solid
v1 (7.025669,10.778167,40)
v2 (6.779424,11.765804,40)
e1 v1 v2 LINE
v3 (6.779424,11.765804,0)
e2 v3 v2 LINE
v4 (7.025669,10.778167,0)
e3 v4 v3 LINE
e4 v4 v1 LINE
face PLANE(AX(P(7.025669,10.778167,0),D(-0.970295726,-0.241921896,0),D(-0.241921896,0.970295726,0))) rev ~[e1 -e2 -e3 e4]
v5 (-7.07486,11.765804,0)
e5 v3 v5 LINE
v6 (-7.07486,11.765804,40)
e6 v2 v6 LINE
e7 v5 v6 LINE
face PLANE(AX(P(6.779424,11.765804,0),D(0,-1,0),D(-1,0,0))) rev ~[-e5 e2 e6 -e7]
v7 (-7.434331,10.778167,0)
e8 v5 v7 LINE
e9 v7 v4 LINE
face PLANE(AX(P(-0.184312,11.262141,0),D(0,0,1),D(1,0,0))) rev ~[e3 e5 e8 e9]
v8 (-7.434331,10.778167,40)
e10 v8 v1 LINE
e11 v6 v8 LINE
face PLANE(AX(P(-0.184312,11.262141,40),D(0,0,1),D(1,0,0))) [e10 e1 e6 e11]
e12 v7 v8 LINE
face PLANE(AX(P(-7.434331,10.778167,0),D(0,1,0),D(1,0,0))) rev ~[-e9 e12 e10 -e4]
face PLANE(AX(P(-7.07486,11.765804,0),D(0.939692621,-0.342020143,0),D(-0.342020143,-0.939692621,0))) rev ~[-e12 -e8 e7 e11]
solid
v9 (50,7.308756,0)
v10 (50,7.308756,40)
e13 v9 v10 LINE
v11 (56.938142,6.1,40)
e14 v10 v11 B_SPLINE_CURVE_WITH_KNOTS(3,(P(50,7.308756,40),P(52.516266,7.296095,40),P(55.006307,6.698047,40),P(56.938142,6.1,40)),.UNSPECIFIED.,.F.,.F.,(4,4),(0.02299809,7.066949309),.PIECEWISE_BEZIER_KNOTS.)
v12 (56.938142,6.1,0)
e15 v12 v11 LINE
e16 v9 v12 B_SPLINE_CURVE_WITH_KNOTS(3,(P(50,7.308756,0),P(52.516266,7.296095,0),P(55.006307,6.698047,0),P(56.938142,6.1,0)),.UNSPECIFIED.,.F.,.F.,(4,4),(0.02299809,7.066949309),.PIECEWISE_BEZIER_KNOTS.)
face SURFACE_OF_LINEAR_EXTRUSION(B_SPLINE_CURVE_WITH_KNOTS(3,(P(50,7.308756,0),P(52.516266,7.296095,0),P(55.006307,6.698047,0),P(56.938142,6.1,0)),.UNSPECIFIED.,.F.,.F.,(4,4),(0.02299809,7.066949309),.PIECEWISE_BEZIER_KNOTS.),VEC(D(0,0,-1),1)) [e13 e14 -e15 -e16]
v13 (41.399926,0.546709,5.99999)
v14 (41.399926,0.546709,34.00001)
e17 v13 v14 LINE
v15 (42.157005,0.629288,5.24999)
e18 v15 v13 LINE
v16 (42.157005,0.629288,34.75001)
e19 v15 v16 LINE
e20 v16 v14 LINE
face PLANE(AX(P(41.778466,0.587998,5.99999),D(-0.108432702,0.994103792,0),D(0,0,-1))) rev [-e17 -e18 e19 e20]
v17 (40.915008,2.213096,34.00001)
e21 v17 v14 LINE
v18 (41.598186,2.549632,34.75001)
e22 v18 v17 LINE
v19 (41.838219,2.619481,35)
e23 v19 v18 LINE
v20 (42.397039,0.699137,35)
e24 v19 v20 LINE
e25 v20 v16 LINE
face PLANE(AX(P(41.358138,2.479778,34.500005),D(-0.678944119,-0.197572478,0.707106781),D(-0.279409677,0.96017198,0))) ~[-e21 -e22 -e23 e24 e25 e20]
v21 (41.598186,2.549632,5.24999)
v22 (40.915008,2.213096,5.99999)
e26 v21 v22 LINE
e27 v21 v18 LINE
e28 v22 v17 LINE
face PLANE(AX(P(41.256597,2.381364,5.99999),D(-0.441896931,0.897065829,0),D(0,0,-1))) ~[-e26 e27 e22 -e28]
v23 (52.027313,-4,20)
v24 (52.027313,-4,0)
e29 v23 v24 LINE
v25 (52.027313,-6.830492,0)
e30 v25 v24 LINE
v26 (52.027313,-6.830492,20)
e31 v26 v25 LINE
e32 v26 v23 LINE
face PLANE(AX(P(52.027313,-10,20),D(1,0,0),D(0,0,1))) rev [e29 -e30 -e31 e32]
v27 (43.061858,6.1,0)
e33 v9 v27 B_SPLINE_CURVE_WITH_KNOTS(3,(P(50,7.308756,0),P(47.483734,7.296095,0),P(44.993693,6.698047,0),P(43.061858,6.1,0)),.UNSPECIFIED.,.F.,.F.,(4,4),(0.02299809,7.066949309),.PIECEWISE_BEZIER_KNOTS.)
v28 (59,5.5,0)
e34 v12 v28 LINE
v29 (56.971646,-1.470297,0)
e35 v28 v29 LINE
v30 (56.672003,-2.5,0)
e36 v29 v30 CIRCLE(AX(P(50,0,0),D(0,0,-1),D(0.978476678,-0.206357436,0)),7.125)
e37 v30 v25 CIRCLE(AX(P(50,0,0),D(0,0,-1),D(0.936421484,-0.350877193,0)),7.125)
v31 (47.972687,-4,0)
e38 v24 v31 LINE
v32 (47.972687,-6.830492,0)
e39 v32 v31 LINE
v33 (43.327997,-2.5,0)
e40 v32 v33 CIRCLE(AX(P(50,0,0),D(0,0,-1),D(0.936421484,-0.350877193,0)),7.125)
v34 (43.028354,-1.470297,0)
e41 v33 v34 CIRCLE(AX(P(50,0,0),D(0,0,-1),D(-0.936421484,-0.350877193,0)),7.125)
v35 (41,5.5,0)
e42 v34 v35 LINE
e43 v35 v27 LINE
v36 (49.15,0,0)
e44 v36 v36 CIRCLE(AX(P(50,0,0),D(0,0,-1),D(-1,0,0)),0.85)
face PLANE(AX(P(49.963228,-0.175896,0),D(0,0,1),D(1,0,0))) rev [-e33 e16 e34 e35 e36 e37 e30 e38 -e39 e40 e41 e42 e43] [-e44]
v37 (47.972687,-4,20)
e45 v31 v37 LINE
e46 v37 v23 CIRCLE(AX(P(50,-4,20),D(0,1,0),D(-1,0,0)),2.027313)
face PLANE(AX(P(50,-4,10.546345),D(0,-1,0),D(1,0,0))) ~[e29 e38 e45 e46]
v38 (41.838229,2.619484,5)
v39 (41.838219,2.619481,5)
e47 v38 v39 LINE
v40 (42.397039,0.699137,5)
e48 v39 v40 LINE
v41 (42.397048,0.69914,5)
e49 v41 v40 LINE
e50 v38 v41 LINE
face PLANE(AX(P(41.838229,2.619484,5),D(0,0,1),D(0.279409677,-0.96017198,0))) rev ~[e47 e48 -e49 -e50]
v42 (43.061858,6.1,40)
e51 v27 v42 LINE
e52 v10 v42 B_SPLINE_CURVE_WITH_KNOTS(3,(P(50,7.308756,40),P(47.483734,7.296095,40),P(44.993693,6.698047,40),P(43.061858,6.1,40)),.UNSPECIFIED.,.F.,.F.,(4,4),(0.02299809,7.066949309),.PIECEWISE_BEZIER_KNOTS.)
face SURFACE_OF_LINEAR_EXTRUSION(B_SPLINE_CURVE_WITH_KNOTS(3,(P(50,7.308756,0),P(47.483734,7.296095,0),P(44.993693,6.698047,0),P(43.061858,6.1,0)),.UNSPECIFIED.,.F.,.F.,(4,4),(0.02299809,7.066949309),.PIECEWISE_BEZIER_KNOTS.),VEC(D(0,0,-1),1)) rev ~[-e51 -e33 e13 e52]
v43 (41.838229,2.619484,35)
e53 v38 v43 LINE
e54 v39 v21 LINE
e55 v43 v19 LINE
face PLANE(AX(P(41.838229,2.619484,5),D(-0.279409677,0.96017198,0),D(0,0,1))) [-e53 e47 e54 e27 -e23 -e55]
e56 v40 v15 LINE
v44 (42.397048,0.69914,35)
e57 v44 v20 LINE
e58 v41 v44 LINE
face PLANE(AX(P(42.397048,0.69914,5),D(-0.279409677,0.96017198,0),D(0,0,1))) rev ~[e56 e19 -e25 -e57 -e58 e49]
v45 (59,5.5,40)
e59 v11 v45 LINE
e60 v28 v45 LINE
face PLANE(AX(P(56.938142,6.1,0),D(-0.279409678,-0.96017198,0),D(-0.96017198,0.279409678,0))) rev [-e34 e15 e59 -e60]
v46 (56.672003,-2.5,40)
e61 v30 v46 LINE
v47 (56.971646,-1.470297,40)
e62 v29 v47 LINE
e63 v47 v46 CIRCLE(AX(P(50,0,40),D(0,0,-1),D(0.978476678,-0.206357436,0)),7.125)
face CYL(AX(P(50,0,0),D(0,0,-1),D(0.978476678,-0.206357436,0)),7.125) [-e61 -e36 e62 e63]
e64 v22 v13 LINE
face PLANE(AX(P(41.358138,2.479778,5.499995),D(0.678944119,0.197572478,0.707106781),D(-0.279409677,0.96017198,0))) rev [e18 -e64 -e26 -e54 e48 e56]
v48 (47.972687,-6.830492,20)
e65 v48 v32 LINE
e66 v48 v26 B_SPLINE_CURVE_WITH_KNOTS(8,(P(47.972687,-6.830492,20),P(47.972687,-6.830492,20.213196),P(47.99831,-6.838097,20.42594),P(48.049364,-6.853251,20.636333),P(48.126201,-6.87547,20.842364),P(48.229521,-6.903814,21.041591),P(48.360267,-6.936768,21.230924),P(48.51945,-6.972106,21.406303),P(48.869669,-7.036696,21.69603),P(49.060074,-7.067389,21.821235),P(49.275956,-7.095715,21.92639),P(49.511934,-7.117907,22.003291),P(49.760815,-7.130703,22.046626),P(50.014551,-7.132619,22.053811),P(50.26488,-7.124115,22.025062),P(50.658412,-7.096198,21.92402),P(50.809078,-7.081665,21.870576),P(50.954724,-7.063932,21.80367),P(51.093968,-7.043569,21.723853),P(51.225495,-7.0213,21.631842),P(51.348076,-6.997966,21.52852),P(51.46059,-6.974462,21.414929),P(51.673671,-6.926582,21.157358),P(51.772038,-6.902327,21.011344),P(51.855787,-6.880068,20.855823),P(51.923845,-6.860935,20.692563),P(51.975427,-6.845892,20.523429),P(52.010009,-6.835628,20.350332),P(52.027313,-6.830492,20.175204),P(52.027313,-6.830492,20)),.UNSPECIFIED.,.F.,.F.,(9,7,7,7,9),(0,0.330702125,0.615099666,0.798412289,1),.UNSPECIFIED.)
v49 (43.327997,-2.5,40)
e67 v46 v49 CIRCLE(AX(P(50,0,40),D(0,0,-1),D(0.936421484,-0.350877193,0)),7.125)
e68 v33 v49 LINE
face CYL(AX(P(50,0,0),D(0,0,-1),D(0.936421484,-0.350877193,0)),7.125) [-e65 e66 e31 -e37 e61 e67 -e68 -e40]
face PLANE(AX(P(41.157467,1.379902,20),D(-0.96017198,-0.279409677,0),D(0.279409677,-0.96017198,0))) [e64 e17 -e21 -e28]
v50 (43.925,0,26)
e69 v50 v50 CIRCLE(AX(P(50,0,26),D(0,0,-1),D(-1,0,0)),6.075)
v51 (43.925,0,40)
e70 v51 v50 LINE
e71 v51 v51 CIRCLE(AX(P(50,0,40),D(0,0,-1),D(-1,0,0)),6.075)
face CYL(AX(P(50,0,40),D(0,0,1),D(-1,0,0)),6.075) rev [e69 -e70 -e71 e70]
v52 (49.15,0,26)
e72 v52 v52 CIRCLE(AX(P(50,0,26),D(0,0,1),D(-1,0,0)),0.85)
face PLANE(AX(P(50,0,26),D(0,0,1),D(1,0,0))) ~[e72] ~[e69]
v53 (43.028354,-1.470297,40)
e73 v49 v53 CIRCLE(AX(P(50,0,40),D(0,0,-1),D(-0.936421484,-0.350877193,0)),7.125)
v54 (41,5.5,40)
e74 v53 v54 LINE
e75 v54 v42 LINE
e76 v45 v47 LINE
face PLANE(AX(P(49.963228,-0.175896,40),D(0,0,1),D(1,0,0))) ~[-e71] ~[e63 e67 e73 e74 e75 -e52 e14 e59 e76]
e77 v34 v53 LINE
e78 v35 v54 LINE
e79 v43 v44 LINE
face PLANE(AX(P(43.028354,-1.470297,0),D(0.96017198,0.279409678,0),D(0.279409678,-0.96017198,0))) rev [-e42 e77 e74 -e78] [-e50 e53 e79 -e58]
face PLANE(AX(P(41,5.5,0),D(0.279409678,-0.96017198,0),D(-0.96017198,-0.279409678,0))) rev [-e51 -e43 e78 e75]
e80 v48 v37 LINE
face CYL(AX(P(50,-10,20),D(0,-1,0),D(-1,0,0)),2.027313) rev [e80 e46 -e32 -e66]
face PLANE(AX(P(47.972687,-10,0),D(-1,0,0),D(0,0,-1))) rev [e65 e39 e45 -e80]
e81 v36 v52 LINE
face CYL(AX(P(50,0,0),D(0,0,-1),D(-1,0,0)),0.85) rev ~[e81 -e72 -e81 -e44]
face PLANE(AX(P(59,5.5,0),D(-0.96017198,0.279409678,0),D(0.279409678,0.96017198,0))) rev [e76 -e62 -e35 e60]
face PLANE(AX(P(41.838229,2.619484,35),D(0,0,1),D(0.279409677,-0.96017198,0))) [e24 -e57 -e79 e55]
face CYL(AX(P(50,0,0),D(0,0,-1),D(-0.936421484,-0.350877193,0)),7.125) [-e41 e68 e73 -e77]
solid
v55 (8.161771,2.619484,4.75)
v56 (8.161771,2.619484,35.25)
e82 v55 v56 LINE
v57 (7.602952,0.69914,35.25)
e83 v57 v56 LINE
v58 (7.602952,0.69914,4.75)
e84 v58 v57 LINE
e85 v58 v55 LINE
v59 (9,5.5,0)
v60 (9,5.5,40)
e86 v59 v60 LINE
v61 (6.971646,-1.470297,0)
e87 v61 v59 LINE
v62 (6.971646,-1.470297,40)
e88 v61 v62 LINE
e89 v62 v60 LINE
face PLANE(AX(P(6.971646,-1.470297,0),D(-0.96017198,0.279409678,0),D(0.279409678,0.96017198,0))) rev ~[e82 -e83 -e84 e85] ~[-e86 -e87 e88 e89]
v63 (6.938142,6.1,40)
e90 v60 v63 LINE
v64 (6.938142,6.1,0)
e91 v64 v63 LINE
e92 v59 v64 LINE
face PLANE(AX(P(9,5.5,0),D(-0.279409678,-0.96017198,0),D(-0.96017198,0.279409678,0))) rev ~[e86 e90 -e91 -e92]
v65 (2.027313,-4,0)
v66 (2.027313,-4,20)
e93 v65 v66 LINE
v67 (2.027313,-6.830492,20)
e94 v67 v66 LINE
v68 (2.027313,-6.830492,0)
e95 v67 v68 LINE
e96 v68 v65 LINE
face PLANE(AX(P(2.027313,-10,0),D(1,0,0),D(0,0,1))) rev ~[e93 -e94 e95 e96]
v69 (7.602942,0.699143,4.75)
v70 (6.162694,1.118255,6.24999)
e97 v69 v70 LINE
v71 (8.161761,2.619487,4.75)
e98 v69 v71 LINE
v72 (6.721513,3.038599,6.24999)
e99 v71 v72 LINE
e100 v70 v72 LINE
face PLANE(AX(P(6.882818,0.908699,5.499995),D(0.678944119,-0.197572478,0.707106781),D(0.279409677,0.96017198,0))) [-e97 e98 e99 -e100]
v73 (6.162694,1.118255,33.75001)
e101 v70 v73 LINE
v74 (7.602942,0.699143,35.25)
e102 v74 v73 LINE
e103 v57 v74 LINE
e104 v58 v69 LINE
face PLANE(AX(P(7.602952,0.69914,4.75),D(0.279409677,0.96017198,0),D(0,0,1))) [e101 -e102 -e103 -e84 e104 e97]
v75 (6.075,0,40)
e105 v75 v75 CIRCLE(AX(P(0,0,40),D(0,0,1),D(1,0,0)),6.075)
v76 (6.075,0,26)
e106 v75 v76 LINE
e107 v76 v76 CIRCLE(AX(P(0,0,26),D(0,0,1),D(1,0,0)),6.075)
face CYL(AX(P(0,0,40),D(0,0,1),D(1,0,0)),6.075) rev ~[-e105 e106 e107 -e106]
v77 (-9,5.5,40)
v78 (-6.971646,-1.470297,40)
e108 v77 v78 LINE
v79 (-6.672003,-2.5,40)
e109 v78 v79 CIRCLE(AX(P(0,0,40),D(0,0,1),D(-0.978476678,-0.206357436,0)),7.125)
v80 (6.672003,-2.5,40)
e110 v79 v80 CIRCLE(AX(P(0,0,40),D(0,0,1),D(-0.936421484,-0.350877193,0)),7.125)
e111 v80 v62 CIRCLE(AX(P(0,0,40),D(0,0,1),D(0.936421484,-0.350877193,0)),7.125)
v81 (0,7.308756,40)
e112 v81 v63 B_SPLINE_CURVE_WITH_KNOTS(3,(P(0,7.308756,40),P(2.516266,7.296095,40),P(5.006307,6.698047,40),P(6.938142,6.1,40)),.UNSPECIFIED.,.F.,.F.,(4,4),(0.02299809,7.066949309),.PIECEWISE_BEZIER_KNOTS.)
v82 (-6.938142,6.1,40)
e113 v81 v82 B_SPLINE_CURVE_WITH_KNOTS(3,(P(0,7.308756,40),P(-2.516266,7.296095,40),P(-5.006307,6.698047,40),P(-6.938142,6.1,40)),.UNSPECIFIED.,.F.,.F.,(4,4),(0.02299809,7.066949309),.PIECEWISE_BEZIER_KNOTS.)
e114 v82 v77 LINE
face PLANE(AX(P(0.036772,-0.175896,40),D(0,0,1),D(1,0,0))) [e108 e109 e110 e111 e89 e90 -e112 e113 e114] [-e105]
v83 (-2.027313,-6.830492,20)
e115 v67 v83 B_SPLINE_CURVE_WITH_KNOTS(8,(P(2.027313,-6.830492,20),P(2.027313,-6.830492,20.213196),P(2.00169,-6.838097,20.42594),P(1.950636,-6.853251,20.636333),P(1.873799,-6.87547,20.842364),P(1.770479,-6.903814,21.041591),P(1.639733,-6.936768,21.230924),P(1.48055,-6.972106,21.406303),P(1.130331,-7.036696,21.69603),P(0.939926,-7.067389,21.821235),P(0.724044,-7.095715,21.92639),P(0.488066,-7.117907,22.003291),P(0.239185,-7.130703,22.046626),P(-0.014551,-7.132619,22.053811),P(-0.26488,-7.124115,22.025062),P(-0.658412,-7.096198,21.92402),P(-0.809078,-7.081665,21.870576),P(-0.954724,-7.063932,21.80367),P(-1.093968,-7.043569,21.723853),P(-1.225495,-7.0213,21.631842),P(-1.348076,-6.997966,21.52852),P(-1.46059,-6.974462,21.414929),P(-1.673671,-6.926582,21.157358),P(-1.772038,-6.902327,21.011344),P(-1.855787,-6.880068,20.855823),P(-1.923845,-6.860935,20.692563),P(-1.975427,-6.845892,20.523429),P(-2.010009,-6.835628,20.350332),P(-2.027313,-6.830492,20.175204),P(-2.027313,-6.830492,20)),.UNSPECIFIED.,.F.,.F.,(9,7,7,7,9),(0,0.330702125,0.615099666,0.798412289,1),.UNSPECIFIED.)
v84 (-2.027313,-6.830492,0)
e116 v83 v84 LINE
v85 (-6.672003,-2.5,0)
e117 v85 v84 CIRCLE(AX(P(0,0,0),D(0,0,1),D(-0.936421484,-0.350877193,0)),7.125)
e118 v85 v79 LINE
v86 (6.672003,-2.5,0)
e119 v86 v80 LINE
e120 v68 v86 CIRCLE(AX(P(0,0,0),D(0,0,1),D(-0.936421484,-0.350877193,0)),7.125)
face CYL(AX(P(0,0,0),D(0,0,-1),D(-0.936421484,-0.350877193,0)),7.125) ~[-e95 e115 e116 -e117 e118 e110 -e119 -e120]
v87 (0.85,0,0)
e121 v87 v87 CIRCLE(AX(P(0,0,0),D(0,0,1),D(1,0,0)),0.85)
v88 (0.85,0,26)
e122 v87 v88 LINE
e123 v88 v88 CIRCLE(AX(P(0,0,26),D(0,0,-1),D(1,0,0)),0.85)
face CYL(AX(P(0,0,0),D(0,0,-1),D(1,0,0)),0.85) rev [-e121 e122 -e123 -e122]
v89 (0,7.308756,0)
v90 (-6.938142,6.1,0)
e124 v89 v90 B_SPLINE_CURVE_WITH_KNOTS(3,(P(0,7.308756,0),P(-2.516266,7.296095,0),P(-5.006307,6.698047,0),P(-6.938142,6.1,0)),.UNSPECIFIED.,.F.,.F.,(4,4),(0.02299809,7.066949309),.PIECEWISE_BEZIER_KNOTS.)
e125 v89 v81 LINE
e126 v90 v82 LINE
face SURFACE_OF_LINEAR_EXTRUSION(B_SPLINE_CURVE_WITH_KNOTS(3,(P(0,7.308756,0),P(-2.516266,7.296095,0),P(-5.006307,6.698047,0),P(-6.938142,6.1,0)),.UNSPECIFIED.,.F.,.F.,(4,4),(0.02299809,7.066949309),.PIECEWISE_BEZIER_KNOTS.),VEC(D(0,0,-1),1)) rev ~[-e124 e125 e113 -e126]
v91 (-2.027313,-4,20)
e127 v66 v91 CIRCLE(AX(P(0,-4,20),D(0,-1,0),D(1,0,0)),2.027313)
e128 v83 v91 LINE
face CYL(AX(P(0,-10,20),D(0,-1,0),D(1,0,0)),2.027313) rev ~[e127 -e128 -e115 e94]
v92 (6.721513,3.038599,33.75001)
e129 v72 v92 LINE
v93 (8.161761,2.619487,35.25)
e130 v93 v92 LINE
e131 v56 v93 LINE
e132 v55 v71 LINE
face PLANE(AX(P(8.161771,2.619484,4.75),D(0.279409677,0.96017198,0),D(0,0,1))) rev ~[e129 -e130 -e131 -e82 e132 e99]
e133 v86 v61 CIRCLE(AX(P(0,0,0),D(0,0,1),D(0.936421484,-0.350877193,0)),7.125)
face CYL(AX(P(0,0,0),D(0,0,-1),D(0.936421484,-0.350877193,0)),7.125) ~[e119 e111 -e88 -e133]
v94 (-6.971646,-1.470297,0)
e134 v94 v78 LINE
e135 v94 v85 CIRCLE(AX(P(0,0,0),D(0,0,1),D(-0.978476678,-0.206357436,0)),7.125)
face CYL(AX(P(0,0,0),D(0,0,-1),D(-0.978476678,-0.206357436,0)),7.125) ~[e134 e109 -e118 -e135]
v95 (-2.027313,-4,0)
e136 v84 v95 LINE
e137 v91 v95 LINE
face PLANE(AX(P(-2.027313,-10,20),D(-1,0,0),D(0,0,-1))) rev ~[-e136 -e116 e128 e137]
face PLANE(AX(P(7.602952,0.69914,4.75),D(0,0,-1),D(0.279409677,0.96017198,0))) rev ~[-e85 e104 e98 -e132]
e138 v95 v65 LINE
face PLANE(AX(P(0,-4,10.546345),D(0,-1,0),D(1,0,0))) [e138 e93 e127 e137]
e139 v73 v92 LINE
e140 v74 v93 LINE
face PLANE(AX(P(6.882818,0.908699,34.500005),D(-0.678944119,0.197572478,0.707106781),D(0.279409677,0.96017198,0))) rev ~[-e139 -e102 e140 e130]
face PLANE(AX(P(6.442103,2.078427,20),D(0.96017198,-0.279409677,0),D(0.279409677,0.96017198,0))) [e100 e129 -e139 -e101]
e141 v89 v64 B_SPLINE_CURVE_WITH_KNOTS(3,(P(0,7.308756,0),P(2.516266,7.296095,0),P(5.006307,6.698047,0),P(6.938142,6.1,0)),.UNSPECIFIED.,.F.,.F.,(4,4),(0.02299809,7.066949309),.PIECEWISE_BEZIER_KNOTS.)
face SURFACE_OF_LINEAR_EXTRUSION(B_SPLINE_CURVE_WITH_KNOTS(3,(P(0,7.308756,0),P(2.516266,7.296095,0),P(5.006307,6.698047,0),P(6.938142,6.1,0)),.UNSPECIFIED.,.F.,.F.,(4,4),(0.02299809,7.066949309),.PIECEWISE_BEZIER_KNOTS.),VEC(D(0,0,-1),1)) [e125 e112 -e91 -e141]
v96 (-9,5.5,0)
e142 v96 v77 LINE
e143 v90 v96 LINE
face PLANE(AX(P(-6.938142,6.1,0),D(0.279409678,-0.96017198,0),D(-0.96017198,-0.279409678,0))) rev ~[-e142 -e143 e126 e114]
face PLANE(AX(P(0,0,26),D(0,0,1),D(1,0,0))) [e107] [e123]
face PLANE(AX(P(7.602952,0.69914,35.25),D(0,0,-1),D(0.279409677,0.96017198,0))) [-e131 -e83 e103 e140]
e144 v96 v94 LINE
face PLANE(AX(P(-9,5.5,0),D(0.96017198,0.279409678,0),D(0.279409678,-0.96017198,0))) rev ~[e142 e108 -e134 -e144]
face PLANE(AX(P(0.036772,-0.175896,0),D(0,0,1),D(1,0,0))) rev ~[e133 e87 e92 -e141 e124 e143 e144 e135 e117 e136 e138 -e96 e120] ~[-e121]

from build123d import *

# Parameters (mm, degrees)
F0_R        = 0.85
F1_DEPTH    = 40
F3_R        = 6.075
F4_DEPTH    = 14
F6_DEPTH    = 40
F9_DEPTH    = 6
F11_W       = 2
F11_H       = 30
F13_DEPTH   = 1
F12_W       = 2
F12_H       = 30.5
F14_DEPTH   = 1.5
F15_SIZE    = 0.99999
F16_SIZE2   = 0.1322452355
F16_SIZE    = 0.75
F16_2_SIZE2 = 0.1322452355
F16_2_SIZE  = 0.75
F17_SIZE    = 1.49999


# Not quite as in the source:
# - a fillet or chamfer is up to 0.001 mm smaller than in the source, because OpenCascade refuses the exact size


with BuildPart() as f1:
    # F0 (on Top) → F1 (new body)
    with BuildSketch(Plane.XY):
        with BuildLine():
            Line((-6.9716463271, -1.4702967352), (-6.6720030725, -2.5))
            ThreePointArc((-6.6720030725, -2.5), (0, -7.125), (6.6720030725, -2.5))
            Line((6.6720030725, -2.5), (6.9716463271, -1.4702967352))
            ThreePointArc((6.9716463271, -1.4702967352), (7.0865578767, -0.739136293), (7.125, 0))
            ThreePointArc((7.125, 0), (-0.739136293, 7.0865578767), (-6.9716463271, -1.4702967352))
        make_face()
        Circle(F0_R, mode=Mode.SUBTRACT)
        with BuildLine():
            ThreePointArc((-6.9716463271, -1.4702967352), (-6.8412253609, -1.9907939525), (-6.6720030725, -2.5))
            Line((-6.6720030725, -2.5), (-6.9716463271, -1.4702967352))
        make_face()
        with BuildLine():
            Line((6.9716463271, -1.4702967352), (6.6720030725, -2.5))
            ThreePointArc((6.6720030725, -2.5), (6.8412253609, -1.9907939525), (6.9716463271, -1.4702967352))
        make_face()
        with BuildLine():
            Line((-9, 5.5), (-6.9716463271, -1.4702967352))
            ThreePointArc((-6.9716463271, -1.4702967352), (-0.739136293, 7.0865578767), (7.125, 0))
            ThreePointArc((7.125, 0), (7.0865578767, -0.739136293), (6.9716463271, -1.4702967352))
            Line((6.9716463271, -1.4702967352), (9, 5.5))
            Line((9, 5.5), (6.9381416086, 6.1))
            add(Edge.make_bspline(
                [(0, 7.3087555656), (2.5162656326, 7.2960948201), (5.0063073264, 6.69804741), (6.9381416086, 6.1)],
                knots=[0.0229980904, 0.0229980904, 0.0229980904, 0.0229980904, 7.0669493094, 7.0669493094, 7.0669493094, 7.0669493094], degree=3))
            add(Edge.make_bspline(
                [(0, 7.3087555656), (-2.5162656326, 7.2960948201), (-5.0063073264, 6.69804741), (-6.9381416086, 6.1)],
                knots=[0.0229980904, 0.0229980904, 0.0229980904, 0.0229980904, 7.0669493094, 7.0669493094, 7.0669493094, 7.0669493094], degree=3))
            Line((-6.9381416086, 6.1), (-9, 5.5))
        make_face()
    extrude(amount=F1_DEPTH)

    # F3 (on face) → F4 (cut)
    with BuildSketch(Plane.XY.offset(40)):
        Circle(F3_R)
    extrude(amount=-F4_DEPTH, mode=Mode.SUBTRACT)

    # F8 (on offset) → F9 (cut)
    with BuildSketch(Plane.XZ.offset(10)):
        with BuildLine():
            Line((-2.0273134933, 20), (-2.0273134933, 0))
            Line((-2.0273134933, 0), (2.0273134933, 0))
            Line((2.0273134933, 0), (2.0273134933, 20))
            ThreePointArc((2.0273134933, 20), (0, 22.0273134933), (-2.0273134933, 20))
        make_face()
    extrude(amount=-F9_DEPTH, mode=Mode.SUBTRACT)


with BuildPart() as f6:
    # F5 (on Top) → F6 (new body)
    with BuildSketch(Plane.XY):
        Polygon((6.7794237824, 11.7658044089), (-7.0748599067, 11.7658044089), (-7.4343305431, 10.7781669524), (7.0256694569, 10.7781669524), align=None)
    extrude(amount=F6_DEPTH)


with BuildPart() as f10_1:
    # F10: instance of F1
    add(f1.part.mirror(Plane.YZ.offset(25)))

    # F11 (on face) → F13 (join)
    with BuildSketch(Plane(origin=(39.2746869048, 11.4289188052, 0), x_dir=(0.2794096775, -0.9601719805, 0), z_dir=(-0.9601719805, -0.2794096775, 0))):
        with Locations((10.1748508868, 20)):
            Rectangle(F11_W, F11_H)
    extrude(amount=F13_DEPTH)

    # F15 (size 1 in the source; OpenCascade refuses exactly that, so slightly less here)
    f15_edges = [f10_1.edges().sort_by_distance(p)[0] for p in [
        (41.157467, 1.379902, 5),
        (41.157467, 1.379902, 35),
    ]]
    chamfer(f15_edges, length=F15_SIZE)

    # F16
    f16_edges = [f10_1.edges().sort_by_distance(p)[0] for p in [
        (41.436876, 0.41973, 20),
    ]]
    f16_side = f10_1.faces().sort_by_distance((41.922481, 0.561041, 20))[0]
    chamfer(f16_edges, length=F16_SIZE, length2=F16_SIZE2, reference=f16_side)

    # F16#2
    f16_2_edges = [f10_1.edges().sort_by_distance(p)[0] for p in [
        (40.878057, 2.340074, 20),
    ]]
    f16_2_side = f10_1.faces().sort_by_distance((41.363661, 2.481385, 20))[0]
    chamfer(f16_2_edges, length=F16_2_SIZE, length2=F16_2_SIZE2, reference=f16_2_side)


with BuildPart() as f1_1:
    add(f1.part)

    # F12 (on face) → F14 (cut)
    with BuildSketch(Plane(origin=(6.8218246998, -1.9851483676, 0), x_dir=(0.2794096775, 0.9601719805, 0), z_dir=(0.9601719805, -0.2794096775, 0))):
        with Locations((3.7956329906, 20)):
            Rectangle(F12_W, F12_H)
    extrude(amount=-F14_DEPTH, mode=Mode.SUBTRACT)

    # F17 (size 1.5 in the source; OpenCascade refuses exactly that, so slightly less here)
    f17_edges = [f1_1.edges().sort_by_distance(p)[0] for p in [
        (6.442103, 2.078427, 35.25),
        (6.442103, 2.078427, 4.75),
    ]]
    chamfer(f17_edges, length=F17_SIZE)


solid = Compound([f6.part, f10_1.part, f1_1.part])
